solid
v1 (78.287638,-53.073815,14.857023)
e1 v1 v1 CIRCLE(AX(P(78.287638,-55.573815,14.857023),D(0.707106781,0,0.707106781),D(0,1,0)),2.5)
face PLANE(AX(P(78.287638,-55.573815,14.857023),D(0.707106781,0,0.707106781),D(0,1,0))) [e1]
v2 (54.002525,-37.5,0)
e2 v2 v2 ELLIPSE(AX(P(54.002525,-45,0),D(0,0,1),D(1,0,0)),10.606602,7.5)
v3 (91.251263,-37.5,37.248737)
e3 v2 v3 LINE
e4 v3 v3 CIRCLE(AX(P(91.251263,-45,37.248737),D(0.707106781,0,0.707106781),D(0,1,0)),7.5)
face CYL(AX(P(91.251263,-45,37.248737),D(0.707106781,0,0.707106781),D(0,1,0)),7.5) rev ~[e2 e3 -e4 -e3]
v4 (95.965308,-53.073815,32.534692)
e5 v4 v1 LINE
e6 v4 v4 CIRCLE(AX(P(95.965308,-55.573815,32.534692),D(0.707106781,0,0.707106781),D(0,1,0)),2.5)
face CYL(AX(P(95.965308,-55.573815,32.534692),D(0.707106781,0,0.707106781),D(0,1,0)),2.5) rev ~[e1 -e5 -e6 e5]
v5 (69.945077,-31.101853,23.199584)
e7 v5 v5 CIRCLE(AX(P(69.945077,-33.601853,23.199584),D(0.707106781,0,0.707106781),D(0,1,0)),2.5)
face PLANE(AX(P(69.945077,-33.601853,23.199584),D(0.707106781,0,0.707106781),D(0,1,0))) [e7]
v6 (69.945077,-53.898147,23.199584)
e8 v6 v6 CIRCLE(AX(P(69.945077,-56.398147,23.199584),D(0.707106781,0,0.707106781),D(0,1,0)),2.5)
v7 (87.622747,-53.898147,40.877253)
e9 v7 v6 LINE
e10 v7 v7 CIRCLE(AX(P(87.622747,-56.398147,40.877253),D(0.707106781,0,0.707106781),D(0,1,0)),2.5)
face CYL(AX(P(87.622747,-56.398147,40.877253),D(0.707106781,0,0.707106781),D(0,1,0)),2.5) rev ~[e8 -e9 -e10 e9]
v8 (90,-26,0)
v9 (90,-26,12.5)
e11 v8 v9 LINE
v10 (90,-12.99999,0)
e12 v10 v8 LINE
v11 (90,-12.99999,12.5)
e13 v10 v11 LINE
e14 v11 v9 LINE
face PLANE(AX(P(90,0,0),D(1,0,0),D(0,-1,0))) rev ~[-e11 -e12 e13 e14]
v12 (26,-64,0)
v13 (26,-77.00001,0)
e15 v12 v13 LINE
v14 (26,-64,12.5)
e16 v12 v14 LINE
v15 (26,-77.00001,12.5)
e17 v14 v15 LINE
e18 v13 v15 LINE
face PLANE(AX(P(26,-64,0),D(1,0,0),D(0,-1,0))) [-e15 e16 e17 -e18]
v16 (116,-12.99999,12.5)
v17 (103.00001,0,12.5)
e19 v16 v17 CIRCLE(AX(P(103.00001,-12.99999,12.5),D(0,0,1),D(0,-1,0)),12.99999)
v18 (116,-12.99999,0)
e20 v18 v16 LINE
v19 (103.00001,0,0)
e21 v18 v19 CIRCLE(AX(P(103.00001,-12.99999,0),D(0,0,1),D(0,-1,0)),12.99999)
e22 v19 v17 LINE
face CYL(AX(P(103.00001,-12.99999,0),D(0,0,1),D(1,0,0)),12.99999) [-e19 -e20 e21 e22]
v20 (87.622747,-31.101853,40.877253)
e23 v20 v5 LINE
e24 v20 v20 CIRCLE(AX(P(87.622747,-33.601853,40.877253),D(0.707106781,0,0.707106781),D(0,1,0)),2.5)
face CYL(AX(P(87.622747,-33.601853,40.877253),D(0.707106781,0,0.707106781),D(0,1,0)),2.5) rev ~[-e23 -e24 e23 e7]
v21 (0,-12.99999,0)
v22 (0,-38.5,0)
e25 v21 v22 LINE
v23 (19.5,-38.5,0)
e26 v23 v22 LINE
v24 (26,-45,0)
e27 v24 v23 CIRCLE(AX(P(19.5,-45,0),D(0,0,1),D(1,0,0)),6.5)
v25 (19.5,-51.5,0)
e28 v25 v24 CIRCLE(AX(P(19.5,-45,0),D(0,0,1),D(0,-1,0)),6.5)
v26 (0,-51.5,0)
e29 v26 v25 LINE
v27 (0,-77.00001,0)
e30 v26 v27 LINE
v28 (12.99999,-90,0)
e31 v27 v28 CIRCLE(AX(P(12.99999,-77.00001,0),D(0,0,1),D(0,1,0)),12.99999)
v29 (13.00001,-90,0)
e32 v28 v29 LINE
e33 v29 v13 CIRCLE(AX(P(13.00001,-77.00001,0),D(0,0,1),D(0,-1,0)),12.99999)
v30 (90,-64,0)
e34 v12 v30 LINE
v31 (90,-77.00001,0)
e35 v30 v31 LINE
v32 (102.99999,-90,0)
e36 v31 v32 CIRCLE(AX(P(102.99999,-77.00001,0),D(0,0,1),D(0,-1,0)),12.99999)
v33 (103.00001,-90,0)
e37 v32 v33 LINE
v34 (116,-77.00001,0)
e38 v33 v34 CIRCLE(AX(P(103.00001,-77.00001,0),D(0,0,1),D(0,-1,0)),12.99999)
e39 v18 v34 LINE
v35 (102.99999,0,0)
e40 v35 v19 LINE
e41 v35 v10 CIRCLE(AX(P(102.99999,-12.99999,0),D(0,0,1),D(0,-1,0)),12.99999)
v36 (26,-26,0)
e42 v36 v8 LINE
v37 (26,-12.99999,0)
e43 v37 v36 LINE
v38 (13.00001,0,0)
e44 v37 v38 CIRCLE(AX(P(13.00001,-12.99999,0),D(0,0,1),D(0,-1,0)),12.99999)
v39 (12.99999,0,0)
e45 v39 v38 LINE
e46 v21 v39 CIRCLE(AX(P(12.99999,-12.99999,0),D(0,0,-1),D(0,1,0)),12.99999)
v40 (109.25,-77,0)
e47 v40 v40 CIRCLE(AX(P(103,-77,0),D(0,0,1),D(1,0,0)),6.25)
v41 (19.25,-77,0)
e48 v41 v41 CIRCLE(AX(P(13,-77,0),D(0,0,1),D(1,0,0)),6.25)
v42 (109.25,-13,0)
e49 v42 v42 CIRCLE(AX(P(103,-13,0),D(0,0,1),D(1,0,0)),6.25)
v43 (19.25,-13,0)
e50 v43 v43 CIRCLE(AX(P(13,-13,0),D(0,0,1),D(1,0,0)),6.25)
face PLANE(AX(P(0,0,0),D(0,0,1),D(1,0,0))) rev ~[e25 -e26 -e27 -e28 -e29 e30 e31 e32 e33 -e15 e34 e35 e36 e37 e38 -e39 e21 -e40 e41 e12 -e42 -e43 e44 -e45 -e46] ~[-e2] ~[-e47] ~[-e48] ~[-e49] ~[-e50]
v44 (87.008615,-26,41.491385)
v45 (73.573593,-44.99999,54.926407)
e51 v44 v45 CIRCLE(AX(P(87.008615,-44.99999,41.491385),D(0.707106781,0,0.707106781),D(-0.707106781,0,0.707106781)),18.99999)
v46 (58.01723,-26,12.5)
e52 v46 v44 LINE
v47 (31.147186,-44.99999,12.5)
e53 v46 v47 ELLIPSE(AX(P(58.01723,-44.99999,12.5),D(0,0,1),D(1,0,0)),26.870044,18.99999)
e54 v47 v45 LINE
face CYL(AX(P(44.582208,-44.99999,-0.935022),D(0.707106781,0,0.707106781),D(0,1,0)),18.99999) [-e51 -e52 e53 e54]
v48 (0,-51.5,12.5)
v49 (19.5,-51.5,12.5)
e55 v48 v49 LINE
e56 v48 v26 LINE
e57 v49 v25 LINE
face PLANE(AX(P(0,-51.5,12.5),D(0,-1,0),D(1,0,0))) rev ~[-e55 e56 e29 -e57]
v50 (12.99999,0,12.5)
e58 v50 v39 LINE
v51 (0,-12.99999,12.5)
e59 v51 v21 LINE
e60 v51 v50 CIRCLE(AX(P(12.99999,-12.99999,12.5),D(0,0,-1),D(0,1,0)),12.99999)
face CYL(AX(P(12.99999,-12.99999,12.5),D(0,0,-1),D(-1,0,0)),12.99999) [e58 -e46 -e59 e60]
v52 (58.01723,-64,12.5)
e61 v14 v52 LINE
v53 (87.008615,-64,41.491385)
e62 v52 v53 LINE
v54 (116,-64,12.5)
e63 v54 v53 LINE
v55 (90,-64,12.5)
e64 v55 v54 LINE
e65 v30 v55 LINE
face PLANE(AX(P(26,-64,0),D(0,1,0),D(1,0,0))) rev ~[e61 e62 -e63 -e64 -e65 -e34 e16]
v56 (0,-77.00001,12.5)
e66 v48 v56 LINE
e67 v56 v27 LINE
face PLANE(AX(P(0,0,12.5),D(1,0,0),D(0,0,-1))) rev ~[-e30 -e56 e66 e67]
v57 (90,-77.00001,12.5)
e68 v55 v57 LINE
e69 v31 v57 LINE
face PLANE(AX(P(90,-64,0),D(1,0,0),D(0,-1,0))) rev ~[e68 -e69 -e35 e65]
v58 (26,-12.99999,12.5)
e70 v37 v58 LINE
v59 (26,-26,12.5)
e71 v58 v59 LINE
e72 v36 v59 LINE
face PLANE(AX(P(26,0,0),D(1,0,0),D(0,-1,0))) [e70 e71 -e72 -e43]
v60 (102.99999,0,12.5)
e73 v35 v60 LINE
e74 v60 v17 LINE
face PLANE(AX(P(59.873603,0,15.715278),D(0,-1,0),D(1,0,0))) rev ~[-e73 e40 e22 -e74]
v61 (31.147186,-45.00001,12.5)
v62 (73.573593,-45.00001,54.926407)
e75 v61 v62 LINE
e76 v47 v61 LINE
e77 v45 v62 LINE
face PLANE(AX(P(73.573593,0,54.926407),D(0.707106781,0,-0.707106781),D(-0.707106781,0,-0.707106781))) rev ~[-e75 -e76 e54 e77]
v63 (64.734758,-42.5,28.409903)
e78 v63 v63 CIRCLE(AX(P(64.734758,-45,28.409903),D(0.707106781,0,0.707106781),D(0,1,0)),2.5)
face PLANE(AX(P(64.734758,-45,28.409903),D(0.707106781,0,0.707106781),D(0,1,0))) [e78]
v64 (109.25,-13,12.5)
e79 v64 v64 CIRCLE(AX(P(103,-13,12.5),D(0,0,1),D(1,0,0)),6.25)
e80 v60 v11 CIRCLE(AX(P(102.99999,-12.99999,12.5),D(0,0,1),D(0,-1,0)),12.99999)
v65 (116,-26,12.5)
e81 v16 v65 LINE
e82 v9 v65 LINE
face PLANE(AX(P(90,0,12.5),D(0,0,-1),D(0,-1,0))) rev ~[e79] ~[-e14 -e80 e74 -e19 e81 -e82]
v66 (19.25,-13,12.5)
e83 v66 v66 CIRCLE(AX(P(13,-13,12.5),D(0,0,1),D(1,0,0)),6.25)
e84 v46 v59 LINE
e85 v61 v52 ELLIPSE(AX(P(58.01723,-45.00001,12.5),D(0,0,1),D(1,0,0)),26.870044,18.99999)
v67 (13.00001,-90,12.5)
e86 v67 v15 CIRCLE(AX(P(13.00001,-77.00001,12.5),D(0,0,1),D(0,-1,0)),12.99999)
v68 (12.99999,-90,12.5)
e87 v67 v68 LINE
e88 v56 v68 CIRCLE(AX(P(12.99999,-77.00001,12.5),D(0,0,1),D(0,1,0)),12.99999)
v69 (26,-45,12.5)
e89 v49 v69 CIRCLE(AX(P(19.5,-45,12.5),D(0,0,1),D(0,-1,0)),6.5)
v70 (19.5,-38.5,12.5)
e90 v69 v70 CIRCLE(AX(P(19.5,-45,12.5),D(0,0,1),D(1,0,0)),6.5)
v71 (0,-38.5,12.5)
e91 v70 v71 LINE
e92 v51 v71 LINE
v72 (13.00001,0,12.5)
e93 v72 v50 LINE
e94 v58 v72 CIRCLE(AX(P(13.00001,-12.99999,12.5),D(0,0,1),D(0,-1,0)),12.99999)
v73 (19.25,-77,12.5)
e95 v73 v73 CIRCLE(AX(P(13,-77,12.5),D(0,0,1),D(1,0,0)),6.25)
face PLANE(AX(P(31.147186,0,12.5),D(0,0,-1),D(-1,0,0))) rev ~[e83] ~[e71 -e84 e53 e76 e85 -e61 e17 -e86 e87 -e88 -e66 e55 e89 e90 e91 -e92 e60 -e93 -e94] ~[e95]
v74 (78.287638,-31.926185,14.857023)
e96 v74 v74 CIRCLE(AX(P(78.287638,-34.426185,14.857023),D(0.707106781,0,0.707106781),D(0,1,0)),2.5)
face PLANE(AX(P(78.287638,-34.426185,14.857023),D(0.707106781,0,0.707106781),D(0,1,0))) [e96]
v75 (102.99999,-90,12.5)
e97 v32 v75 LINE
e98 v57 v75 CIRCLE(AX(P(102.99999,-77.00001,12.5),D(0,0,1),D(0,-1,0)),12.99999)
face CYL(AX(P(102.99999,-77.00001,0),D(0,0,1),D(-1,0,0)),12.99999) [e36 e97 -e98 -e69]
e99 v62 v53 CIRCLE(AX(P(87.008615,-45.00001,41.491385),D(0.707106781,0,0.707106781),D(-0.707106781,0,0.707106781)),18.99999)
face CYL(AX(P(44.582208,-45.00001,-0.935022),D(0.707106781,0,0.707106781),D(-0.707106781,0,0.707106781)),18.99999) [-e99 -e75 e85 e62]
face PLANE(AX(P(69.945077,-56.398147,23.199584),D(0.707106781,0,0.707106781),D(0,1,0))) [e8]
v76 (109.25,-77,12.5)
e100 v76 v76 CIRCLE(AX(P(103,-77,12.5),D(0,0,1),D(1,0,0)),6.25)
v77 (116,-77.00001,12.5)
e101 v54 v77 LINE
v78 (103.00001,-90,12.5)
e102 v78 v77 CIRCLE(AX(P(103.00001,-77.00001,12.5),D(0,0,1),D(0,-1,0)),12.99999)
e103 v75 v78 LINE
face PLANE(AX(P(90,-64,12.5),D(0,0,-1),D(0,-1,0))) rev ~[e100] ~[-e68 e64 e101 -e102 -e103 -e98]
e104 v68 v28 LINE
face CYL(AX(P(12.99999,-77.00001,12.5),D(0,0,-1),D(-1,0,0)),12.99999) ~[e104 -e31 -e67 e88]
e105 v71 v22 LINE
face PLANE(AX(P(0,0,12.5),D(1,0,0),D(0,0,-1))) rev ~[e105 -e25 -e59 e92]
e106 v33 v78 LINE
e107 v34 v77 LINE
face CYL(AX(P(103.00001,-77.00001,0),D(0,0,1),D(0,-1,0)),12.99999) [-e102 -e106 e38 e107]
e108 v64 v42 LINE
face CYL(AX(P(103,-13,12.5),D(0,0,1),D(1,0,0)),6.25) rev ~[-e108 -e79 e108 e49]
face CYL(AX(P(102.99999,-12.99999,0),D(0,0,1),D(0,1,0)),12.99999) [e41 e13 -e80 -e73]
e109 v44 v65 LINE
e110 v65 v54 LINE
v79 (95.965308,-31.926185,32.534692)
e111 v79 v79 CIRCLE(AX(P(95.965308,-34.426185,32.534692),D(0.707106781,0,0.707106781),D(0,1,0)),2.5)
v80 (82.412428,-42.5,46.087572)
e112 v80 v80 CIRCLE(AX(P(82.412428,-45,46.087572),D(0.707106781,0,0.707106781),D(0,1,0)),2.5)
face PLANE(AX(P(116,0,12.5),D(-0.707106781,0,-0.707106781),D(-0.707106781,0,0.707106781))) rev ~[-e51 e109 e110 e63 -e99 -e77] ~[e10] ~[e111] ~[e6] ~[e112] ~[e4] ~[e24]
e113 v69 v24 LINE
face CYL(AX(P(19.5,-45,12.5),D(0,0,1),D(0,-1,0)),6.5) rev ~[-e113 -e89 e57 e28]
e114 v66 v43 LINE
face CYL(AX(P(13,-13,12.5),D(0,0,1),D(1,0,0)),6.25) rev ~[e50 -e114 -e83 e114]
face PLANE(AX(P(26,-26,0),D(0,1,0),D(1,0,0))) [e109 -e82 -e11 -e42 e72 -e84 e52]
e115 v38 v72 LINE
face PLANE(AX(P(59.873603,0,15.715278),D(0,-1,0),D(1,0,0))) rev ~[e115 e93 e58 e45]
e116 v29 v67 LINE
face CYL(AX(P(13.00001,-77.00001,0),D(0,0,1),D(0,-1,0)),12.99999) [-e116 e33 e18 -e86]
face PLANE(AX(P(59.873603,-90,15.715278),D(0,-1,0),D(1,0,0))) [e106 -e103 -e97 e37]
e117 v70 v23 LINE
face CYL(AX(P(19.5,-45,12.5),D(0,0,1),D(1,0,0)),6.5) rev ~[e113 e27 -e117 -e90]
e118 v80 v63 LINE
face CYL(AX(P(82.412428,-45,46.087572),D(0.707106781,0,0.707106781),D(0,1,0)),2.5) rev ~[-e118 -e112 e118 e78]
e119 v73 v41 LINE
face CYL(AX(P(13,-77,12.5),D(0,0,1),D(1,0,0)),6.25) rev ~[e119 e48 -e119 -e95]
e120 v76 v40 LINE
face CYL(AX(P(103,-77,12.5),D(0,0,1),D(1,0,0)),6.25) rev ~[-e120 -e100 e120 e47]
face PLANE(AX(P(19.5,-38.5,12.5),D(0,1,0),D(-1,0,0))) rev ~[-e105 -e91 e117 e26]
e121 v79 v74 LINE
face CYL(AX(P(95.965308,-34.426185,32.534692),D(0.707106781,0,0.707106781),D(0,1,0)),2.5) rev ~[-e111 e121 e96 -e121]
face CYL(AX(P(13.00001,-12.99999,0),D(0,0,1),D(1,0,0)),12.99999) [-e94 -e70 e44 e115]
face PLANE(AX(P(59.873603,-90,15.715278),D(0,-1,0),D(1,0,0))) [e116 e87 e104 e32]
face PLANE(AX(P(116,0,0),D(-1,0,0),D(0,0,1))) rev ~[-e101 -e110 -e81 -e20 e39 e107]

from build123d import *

# Parameters (mm, degrees)
F1_DEPTH  = 90
F2_W      = 64
F2_H      = 26
F3_DEPTH  = 100
F4_W      = 26
F4_H      = 26
F5_DEPTH  = 100
F6_W      = 26
F6_H      = 26
F7_DEPTH  = 105
F8_R      = 12.99999
F9_R      = 18.99999
F10_R     = 7.5
F10_R_2   = 2.5
F11_DEPTH = 25
F13_DEPTH = 25
F15_DEPTH = 25
F17_DEPTH = 25
F19_DEPTH = 25
F20_R     = 7.5
F21_DEPTH = 100


# Not quite as in the source:
# - a fillet or chamfer is up to 0.001 mm smaller than in the source, because OpenCascade refuses the exact size


with BuildPart() as f1:
    # F0 (on Front) → F1 (new body)
    with BuildSketch(Plane.XZ):
        Polygon((0, 12.5), (0, 0), (116, 0), (116, 12.5), (73.5735931288, 54.9264068712), (31.1471862576, 12.5), align=None)
    extrude(amount=F1_DEPTH)

    # F2 (on face) → F3 (cut)
    with BuildSketch(Plane(origin=(0, 0, 0), x_dir=(1, 0, 0), z_dir=(0, 0, -1))):
        with Locations((58, 77)):
            Rectangle(F2_W, F2_H)
        with Locations((58, 13)):
            Rectangle(F2_W, F2_H)
    extrude(amount=-F3_DEPTH, mode=Mode.SUBTRACT)

    # F4 (on face) → F5 (cut)
    with BuildSketch(Plane(origin=(90, 0, 0), x_dir=(0, -1, 0), z_dir=(-1, 0, 0))):
        with Locations((13, 25.5)):
            Rectangle(F4_W, F4_H)
    extrude(amount=-F5_DEPTH, mode=Mode.SUBTRACT)

    # F6 (on face) → F7 (cut)
    with BuildSketch(Plane(origin=(90, 0, 0), x_dir=(0, -1, 0), z_dir=(-1, 0, 0))):
        with Locations((77, 25.5)):
            Rectangle(F6_W, F6_H)
    extrude(amount=-F7_DEPTH, mode=Mode.SUBTRACT)

    # F8 (radius 13 in the source; OpenCascade refuses exactly that, so slightly less here)
    f8_edges = [f1.edges().sort_by_distance(p)[0] for p in [
        (0, 0, 6.25),
        (26, 0, 6.25),
        (116, -90, 6.25),
        (90, -90, 6.25),
        (26, -90, 6.25),
        (0, -90, 6.25),
        (116, 0, 6.25),
        (90, 0, 6.25),
    ]]
    fillet(f8_edges, radius=F8_R)

    # F9 (radius 19 in the source; OpenCascade refuses exactly that, so slightly less here)
    f9_edges = [f1.edges().sort_by_distance(p)[0] for p in [
        (52.36039, -64, 33.713203),
        (52.36039, -26, 33.713203),
    ]]
    fillet(f9_edges, radius=F9_R)

    # F10 (on face) → F11 (cut)
    with BuildSketch(Plane(origin=(64.25, 0, 64.25), x_dir=(0, 1, 0), z_dir=(0.7071067812, 0, 0.7071067812))):
        with Locations((-45, -38.1855518528)):
            Circle(F10_R)
        with Locations((-45, -25.6855518528)):
            Circle(F10_R_2)
        with Locations((-33.6018534744, -33.0540554063)):
            Circle(F10_R_2)
        with Locations((-56.3981465256, -33.0540554063)):
            Circle(F10_R_2)
        with Locations((-55.573814617, -44.8522185195)):
            Circle(F10_R_2)
        with Locations((-34.426185383, -44.8522185195)):
            Circle(F10_R_2)
    extrude(amount=-F11_DEPTH, mode=Mode.SUBTRACT)

    # F12 (on face) → F13 (cut)
    with BuildSketch(Plane.XY.offset(12.5)):
        with BuildLine():
            ThreePointArc((6.75, -13), (13, -19.25), (19.25, -13))
            ThreePointArc((19.25, -13), (13, -6.75), (6.75, -13))
        make_face()
        with BuildLine():
            ThreePointArc((6.75, -77), (13, -83.25), (19.25, -77))
            ThreePointArc((19.25, -77), (13, -70.75), (6.75, -77))
        make_face()
    extrude(amount=-F13_DEPTH, mode=Mode.SUBTRACT)

    # F14 (on face) → F15 (cut)
    with BuildSketch(Plane.XY.offset(12.5)):
        with BuildLine():
            ThreePointArc((96.75, -13), (103, -19.25), (109.25, -13))
            ThreePointArc((109.25, -13), (103, -6.75), (96.75, -13))
        make_face()
    extrude(amount=-F15_DEPTH, mode=Mode.SUBTRACT)

    # F16 (on face) → F17 (cut)
    with BuildSketch(Plane.XY.offset(12.5)):
        with BuildLine():
            ThreePointArc((96.75, -77), (103, -83.25), (109.25, -77))
            ThreePointArc((109.25, -77), (103, -70.75), (96.75, -77))
        make_face()
    extrude(amount=-F17_DEPTH, mode=Mode.SUBTRACT)

    # F18 (on face) → F19 (cut)
    with BuildSketch(Plane.XY.offset(12.5)):
        with BuildLine():
            Line((19.5, -38.5), (0, -38.5))
            Line((0, -38.5), (0, -45))
            Line((0, -45), (0, -51.5))
            Line((0, -51.5), (19.5, -51.5))
            ThreePointArc((19.5, -51.5), (24.0961940777, -49.5961940777), (26, -45))
            ThreePointArc((26, -45), (24.0961940777, -40.4038059223), (19.5, -38.5))
        make_face()
    extrude(amount=-F19_DEPTH, mode=Mode.SUBTRACT)

    # F20 (on face) → F21 (cut)
    with BuildSketch(Plane(origin=(64.25, 0, 64.25), x_dir=(0, 1, 0), z_dir=(0.7071067812, 0, 0.7071067812))):
        with Locations((-45, -38.1855518528)):
            Circle(F20_R)
    extrude(amount=-F21_DEPTH, mode=Mode.SUBTRACT)


solid = f1.part
